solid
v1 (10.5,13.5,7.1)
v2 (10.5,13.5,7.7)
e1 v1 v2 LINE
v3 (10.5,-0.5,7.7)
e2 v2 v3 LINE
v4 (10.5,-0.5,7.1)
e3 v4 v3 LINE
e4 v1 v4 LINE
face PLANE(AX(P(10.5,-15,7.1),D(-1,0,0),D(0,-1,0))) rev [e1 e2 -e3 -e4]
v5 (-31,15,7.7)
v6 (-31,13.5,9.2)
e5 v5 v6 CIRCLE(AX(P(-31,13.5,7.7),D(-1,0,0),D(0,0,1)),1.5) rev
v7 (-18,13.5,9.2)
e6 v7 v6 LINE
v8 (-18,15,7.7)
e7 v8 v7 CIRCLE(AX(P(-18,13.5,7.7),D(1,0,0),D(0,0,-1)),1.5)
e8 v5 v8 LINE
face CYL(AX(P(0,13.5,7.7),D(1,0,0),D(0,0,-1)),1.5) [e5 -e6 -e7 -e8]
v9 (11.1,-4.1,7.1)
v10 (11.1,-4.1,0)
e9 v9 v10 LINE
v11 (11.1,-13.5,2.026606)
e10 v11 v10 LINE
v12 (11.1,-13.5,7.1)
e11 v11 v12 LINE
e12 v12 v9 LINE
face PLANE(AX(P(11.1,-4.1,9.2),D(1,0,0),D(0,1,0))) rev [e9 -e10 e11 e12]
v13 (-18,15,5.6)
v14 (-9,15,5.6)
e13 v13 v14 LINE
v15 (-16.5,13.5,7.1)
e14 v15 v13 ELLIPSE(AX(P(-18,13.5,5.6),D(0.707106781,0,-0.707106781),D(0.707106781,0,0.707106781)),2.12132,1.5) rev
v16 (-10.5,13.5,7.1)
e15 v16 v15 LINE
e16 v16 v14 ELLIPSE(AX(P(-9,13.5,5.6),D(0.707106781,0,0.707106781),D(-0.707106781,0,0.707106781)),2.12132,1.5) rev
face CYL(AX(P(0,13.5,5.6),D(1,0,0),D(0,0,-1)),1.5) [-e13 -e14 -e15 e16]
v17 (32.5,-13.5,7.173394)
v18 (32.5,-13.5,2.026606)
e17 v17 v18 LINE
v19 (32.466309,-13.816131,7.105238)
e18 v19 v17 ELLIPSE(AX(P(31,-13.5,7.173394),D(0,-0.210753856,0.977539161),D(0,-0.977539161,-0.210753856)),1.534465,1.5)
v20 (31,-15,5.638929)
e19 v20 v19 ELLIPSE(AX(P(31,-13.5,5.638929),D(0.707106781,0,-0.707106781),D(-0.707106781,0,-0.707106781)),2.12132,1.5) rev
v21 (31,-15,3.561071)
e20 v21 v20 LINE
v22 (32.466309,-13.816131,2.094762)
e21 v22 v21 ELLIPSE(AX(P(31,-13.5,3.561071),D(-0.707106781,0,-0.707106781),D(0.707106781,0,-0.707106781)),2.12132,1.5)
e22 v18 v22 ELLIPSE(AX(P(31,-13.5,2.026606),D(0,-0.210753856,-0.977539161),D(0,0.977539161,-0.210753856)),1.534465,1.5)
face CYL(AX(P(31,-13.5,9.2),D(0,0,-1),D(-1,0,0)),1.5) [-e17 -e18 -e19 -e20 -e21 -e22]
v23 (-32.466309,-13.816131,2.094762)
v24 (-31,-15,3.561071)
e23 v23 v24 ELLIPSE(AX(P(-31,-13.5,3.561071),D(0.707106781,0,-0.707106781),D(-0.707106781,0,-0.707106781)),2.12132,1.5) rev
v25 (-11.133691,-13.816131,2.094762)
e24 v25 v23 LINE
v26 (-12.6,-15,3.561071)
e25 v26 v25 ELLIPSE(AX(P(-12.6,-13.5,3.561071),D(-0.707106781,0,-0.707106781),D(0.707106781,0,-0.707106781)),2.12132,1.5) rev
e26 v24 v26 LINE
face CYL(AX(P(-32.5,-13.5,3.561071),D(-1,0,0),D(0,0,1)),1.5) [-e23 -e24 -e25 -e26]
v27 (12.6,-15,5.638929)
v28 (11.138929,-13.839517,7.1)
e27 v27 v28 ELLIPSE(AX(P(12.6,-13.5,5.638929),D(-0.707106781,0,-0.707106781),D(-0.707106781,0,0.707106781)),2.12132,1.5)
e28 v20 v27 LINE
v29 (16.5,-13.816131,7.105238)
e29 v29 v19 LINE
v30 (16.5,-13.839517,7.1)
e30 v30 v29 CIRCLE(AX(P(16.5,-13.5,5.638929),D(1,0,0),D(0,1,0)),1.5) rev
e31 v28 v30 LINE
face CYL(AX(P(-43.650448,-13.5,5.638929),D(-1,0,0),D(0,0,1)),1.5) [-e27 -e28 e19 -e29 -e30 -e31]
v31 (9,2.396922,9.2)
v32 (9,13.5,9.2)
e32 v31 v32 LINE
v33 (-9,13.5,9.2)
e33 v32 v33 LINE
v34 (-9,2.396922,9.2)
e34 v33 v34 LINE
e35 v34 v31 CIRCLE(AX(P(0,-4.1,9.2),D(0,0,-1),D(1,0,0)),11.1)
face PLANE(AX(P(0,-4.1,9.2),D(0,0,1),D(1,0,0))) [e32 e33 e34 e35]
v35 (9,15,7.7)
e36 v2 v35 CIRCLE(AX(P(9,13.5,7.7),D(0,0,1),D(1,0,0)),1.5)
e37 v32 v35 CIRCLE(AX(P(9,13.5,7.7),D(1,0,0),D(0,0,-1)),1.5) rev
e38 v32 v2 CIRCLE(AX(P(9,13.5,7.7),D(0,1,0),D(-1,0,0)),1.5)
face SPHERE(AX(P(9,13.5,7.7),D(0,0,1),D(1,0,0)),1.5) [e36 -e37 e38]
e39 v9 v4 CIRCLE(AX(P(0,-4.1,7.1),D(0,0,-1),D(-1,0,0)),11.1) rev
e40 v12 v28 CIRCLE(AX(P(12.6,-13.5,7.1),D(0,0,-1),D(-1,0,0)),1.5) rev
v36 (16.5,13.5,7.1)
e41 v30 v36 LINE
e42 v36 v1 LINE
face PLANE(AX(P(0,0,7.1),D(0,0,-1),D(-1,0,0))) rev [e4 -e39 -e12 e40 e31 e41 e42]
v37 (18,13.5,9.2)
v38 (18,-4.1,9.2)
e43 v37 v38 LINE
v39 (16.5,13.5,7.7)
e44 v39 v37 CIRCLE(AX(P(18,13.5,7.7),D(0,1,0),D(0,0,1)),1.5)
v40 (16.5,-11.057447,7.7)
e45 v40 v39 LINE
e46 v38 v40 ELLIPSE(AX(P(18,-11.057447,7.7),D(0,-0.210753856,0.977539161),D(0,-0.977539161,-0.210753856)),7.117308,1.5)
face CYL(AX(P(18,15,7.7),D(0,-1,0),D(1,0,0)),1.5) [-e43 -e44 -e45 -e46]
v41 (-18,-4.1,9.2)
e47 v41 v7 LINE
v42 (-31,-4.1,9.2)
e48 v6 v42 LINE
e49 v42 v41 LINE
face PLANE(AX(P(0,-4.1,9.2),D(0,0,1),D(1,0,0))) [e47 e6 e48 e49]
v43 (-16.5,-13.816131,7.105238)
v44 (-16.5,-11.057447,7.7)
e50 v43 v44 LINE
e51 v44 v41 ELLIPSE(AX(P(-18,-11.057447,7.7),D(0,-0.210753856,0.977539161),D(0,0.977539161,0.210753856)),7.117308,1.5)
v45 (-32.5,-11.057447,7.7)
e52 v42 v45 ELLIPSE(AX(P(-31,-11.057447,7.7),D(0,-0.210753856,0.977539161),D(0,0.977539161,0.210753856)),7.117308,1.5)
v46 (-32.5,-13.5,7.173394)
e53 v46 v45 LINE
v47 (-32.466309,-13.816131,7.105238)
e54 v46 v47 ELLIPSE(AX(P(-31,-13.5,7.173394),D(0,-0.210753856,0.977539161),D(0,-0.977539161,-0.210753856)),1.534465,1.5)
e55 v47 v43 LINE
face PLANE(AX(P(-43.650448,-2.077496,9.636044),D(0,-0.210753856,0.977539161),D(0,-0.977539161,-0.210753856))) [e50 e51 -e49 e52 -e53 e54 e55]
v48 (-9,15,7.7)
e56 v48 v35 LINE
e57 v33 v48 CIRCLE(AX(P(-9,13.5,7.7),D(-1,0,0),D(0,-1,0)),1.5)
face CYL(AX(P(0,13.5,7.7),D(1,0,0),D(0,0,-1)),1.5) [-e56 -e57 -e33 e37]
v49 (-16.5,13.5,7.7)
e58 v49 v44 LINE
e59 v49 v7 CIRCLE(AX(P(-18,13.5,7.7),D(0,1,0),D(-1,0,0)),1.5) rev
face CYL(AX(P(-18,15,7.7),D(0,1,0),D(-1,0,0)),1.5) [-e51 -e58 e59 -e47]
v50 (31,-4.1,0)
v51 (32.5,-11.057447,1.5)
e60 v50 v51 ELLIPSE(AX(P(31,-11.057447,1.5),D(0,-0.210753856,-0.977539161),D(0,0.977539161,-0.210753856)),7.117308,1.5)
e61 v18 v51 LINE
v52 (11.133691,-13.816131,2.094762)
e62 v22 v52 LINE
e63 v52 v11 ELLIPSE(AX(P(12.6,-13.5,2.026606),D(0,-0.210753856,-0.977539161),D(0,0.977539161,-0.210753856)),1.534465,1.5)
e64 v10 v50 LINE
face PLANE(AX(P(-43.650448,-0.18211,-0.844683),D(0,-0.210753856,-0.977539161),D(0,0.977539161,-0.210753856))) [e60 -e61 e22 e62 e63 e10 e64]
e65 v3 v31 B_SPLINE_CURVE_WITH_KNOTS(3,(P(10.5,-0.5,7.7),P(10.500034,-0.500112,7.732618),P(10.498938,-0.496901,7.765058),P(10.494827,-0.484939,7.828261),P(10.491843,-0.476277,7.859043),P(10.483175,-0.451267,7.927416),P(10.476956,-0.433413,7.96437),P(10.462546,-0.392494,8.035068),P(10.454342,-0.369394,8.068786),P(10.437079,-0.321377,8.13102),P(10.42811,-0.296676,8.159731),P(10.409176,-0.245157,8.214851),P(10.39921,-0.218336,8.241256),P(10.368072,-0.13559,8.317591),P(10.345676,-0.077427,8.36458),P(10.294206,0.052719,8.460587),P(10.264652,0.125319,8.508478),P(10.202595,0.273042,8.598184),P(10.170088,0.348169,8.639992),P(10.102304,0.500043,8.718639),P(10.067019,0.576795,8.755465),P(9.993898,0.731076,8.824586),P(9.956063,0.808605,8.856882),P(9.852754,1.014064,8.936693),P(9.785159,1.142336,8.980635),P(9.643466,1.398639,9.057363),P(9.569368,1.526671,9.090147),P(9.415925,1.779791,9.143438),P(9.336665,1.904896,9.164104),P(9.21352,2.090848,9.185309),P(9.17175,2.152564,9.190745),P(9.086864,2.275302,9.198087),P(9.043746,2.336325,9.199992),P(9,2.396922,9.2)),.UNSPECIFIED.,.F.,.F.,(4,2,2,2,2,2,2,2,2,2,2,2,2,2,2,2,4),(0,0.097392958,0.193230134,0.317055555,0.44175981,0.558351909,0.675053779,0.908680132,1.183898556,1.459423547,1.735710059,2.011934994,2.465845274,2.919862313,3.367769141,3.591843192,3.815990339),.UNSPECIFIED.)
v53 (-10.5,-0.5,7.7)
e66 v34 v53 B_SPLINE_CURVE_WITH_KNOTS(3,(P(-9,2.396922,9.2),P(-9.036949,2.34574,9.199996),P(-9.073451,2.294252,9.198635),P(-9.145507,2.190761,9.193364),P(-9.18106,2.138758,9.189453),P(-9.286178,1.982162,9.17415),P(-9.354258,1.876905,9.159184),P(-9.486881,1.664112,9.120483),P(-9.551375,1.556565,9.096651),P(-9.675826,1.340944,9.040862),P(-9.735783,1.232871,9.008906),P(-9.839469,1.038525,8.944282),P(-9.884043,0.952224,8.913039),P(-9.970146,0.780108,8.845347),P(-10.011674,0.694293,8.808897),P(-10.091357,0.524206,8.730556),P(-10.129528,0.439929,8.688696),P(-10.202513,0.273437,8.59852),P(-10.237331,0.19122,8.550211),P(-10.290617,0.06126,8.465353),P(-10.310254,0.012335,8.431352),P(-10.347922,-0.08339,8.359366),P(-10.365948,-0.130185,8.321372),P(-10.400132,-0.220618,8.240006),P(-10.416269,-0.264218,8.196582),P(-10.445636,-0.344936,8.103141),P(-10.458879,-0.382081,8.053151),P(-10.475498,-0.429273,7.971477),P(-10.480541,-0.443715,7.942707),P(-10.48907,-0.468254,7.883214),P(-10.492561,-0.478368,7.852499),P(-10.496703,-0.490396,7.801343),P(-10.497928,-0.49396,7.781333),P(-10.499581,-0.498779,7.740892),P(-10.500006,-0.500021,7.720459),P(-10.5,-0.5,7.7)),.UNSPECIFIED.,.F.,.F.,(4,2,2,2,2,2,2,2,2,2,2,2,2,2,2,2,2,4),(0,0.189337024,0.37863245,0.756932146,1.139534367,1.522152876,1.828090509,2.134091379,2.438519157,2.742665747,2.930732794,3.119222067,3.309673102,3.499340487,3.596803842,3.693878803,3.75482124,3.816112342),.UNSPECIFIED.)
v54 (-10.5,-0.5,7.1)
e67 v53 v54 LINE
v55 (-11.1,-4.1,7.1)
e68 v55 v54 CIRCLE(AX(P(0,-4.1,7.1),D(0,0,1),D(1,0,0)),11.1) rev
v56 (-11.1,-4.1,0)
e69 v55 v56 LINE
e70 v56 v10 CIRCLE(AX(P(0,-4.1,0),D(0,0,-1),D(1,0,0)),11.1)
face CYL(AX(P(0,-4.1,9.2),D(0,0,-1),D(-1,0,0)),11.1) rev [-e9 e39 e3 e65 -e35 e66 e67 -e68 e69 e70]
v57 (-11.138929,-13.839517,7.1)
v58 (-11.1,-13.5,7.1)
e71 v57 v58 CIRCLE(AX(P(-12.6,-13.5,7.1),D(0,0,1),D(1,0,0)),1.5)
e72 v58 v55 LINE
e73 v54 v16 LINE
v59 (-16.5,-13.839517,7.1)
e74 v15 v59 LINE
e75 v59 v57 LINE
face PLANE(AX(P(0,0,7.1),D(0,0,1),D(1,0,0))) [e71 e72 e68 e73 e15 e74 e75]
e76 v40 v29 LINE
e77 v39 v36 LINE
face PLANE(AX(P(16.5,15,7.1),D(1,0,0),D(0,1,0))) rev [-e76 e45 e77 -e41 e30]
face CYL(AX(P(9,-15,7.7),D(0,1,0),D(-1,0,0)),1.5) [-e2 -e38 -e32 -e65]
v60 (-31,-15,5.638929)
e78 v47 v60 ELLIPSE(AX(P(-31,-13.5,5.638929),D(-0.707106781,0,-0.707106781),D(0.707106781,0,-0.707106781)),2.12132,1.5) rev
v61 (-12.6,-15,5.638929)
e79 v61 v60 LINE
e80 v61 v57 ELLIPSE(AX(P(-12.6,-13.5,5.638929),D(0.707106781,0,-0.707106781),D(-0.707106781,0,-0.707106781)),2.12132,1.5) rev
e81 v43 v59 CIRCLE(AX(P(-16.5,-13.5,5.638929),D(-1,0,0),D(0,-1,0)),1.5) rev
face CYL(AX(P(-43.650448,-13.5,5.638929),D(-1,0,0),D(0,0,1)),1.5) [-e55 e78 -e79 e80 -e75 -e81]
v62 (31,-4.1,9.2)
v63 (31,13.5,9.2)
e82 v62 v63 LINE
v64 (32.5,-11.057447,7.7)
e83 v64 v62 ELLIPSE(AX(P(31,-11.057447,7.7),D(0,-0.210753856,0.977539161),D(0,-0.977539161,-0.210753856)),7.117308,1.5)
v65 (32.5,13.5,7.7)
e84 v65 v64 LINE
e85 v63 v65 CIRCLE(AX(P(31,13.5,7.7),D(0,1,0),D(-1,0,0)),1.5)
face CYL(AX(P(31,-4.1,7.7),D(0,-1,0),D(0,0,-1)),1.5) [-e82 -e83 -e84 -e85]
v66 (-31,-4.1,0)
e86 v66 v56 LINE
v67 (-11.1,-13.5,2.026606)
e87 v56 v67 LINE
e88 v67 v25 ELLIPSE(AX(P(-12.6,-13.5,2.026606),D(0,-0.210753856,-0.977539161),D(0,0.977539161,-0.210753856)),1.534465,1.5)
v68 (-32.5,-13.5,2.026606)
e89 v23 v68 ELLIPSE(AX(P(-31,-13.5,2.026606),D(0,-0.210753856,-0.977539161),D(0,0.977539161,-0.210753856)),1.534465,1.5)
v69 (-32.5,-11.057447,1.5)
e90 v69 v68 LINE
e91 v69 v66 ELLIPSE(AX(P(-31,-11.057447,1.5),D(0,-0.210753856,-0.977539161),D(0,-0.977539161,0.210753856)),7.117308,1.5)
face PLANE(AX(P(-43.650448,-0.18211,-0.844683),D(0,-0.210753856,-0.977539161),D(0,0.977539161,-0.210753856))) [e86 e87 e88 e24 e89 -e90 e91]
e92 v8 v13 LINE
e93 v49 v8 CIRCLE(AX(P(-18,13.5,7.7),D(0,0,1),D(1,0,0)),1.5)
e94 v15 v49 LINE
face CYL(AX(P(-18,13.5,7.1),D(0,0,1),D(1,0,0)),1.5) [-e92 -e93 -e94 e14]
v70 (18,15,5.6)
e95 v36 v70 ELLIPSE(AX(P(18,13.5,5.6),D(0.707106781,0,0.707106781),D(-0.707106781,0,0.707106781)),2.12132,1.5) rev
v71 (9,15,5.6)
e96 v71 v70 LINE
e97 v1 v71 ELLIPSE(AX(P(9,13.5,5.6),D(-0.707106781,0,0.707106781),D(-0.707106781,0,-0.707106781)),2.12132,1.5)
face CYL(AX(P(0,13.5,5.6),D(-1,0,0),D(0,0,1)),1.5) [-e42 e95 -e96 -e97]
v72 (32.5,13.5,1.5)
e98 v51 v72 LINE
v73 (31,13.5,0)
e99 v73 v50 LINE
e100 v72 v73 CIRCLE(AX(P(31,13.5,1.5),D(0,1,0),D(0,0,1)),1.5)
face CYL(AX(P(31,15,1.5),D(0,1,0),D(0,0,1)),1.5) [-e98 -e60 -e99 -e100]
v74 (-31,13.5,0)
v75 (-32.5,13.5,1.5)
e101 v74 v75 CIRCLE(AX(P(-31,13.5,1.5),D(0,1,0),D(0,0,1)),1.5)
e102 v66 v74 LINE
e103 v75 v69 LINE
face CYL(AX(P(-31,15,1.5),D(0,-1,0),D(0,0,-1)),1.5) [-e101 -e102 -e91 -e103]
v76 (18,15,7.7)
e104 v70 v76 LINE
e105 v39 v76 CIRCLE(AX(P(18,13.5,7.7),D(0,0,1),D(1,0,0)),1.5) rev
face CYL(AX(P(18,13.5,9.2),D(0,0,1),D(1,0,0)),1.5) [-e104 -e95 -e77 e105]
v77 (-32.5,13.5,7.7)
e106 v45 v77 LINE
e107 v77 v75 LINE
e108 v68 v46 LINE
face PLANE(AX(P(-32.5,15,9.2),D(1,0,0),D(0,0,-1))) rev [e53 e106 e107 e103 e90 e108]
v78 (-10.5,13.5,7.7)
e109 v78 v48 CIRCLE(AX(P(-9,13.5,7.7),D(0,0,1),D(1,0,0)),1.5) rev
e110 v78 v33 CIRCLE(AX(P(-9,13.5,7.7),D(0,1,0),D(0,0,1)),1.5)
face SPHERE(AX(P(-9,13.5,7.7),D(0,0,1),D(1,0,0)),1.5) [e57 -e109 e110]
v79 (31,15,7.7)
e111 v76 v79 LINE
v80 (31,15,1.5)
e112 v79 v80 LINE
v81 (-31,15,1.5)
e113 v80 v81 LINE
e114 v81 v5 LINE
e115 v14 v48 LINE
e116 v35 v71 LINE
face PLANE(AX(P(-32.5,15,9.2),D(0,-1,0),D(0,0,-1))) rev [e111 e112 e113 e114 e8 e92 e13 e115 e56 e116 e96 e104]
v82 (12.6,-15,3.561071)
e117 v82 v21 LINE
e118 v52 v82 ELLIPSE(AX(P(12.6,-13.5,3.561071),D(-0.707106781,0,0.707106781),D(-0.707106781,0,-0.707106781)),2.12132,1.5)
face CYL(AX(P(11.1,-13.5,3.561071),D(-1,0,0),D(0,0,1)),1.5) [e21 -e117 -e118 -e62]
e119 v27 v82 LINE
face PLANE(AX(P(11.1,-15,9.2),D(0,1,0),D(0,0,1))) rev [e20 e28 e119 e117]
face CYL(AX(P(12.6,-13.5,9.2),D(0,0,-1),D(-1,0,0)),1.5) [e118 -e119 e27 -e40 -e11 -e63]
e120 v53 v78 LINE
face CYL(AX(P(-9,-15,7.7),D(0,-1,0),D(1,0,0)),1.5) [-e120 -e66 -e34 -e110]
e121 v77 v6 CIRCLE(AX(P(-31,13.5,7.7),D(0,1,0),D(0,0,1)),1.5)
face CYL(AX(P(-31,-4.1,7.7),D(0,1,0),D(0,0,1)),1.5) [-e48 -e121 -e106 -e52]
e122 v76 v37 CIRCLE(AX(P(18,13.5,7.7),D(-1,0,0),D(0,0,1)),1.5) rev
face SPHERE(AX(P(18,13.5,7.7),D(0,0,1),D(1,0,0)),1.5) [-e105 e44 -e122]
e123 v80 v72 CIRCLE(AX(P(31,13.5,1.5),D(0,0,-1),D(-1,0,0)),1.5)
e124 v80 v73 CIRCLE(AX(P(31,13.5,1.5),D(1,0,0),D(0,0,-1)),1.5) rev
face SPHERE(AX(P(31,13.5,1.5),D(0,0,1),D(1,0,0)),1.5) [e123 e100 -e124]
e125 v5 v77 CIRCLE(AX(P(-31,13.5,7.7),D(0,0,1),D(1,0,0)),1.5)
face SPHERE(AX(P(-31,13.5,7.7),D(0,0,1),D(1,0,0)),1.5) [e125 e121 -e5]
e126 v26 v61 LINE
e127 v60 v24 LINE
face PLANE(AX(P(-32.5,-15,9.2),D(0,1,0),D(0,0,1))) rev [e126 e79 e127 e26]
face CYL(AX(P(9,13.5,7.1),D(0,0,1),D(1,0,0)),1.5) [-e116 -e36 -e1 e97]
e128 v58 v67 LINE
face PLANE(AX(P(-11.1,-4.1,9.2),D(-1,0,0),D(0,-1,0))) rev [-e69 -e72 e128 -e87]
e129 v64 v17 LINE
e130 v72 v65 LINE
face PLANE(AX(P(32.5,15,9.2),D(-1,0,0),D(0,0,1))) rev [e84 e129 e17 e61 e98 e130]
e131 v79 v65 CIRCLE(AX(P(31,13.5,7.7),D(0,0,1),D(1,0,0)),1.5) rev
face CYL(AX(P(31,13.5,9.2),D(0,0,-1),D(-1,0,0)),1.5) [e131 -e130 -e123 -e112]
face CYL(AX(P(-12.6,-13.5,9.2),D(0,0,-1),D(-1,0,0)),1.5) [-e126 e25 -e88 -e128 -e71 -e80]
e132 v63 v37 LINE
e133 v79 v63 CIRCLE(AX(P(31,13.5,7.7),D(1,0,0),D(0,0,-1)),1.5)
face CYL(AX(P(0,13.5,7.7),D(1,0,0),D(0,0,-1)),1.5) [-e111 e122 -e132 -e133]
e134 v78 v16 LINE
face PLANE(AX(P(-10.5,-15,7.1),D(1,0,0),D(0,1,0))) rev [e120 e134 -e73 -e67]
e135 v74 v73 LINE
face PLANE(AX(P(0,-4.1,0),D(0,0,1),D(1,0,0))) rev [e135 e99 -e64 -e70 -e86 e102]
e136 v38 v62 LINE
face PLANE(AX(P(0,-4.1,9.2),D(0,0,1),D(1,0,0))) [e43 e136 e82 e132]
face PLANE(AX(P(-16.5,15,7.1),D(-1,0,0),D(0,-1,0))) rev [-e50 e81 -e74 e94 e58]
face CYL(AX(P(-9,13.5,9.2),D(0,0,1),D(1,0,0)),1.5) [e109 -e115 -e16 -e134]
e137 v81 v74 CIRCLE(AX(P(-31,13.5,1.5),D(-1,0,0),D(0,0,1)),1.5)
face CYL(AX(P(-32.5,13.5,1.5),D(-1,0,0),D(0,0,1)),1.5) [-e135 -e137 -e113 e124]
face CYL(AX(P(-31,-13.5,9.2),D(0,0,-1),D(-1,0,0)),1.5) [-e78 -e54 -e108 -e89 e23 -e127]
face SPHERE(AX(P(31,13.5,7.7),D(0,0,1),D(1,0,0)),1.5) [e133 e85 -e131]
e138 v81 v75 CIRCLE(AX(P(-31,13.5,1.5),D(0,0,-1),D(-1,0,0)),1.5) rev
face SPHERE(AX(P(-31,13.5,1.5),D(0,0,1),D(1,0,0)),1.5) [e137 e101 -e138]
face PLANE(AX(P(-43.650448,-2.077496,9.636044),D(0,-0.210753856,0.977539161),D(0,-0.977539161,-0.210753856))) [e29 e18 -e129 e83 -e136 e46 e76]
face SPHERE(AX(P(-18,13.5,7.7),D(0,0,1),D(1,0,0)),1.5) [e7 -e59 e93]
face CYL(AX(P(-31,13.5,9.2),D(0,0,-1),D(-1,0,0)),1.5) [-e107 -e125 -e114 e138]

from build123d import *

# Parameters (mm, degrees)
EXTRUDE_1_DEPTH     = 9.2
SKETCH_3_W          = 6
SKETCH_3_H          = 30
CUT_EXTRUDE_2_DEPTH = 2.1
CUT_EXTRUDE_1_REACH = 69.34
FILLET_1_R          = 1.5


with BuildPart() as part:
    # 凸台-拉伸1: read off the stored shape, not the designer's step
    # 凸台-拉伸1 outline → 凸台-拉伸1 (new body)
    with BuildSketch(Plane.XY):
        with BuildLine():
            Line((11.1, -15), (32.5, -15))
            Line((32.5, -15), (32.5, 15))
            Line((32.5, 15), (-32.5, 15))
            Line((-32.5, 15), (-32.5, -15))
            Line((-32.5, -15), (-11.1, -15))
            Line((-11.1, -15), (-11.1, -4.1))
            ThreePointArc((-11.1, -4.1), (0, 7), (11.1, -4.1))
            Line((11.1, -4.1), (11.1, -15))
        make_face()
    extrude(amount=EXTRUDE_1_DEPTH)

    # 草图3 → 切除-拉伸2 (cut)
    with BuildSketch(Plane.XY.offset(9.2)):
        with Locations((-13.5, 0)):
            Rectangle(SKETCH_3_W, SKETCH_3_H)
        with Locations((13.5, 0)):
            Rectangle(SKETCH_3_W, SKETCH_3_H)
    extrude(amount=-CUT_EXTRUDE_2_DEPTH, mode=Mode.SUBTRACT)

    # 切除-拉伸1: up to this face of the body (flat: up to its plane)
    cut_extrude_1_end = Plane(part.part.faces().sort_by_distance((-32.5, 0, 4.6))[0])
    # 草图2 → 切除-拉伸1 (cut, up to the picked face)
    with BuildSketch(Plane(origin=(32.5, 0, 0), x_dir=(0, 0, -1), z_dir=(1, 0, 0)), mode=Mode.PRIVATE) as cut_extrude_1_sk1:
        Polygon((-6.85, -15), (-9.2, -4.1), (-9.2, -15), align=None)
    cut_extrude_1_tool1 = split(extrude(cut_extrude_1_sk1.sketch, amount=-CUT_EXTRUDE_1_REACH, mode=Mode.PRIVATE), bisect_by=cut_extrude_1_end, keep=Keep.BOTH, mode=Mode.PRIVATE)
    # 草图2 → 切除-拉伸1 (cut, up to the picked face)
    with BuildSketch(Plane(origin=(32.5, 0, 0), x_dir=(0, 0, -1), z_dir=(1, 0, 0)), mode=Mode.PRIVATE) as cut_extrude_1_sk2:
        Polygon((0, -4.1), (-2.35, -15), (0, -15), align=None)
    cut_extrude_1_tool2 = split(extrude(cut_extrude_1_sk2.sketch, amount=-CUT_EXTRUDE_1_REACH, mode=Mode.PRIVATE), bisect_by=cut_extrude_1_end, keep=Keep.BOTH, mode=Mode.PRIVATE)
    add(cut_extrude_1_tool1.solids().sort_by(Axis((32.5, -11.366667, 8.416667), (-1, 0, 0)))[0], mode=Mode.SUBTRACT)
    add(cut_extrude_1_tool2.solids().sort_by(Axis((32.5, -11.366667, 0.783333), (-1, 0, 0)))[0], mode=Mode.SUBTRACT)

    # 圆角1
    # the kernel refuses this fillet: 1.5 mm, written as the material it takes off along each edge
    with BuildSketch(Plane(origin=(-31, 13.5, 7.7), x_dir=(0, 0, 1), z_dir=(-1, 0, 0))) as fillet_1_piece_1_section:
        Polygon((0, 0), (FILLET_1_R, 0), (FILLET_1_R, FILLET_1_R), (0, FILLET_1_R), align=None)
    fillet_1_piece_1 = extrude(amount=FILLET_1_R, mode=Mode.PRIVATE)
    fillet_1_piece_1 = fillet_1_piece_1 - Plane(origin=(-31, 13.5, 7.7), x_dir=(0, -0.7071067811865475, -0.7071067811865475), z_dir=(-1, 0, 0)) * Sphere(FILLET_1_R, mode=Mode.PRIVATE)
    add(fillet_1_piece_1, mode=Mode.SUBTRACT)
    with BuildSketch(Plane(origin=(-31, 13.5, 1.5), x_dir=(0, 1, 0), z_dir=(-1, 0, 0))) as fillet_1_piece_2_section:
        Polygon((0, 0), (FILLET_1_R, 0), (FILLET_1_R, FILLET_1_R), (0, FILLET_1_R), align=None)
    fillet_1_piece_2 = extrude(amount=FILLET_1_R, mode=Mode.PRIVATE)
    fillet_1_piece_2 = fillet_1_piece_2 - Plane(origin=(-31, 13.5, 1.5), x_dir=(0, -0.7071067811865475, 0.7071067811865475), z_dir=(-1, 0, 0)) * Sphere(FILLET_1_R, mode=Mode.PRIVATE)
    add(fillet_1_piece_2, mode=Mode.SUBTRACT)
    with BuildSketch(Plane(origin=(31, 13.5, 1.5), x_dir=(1, 0, 0), z_dir=(0, 1, 0))) as fillet_1_piece_3_section:
        Polygon((0, 0), (FILLET_1_R, 0), (FILLET_1_R, FILLET_1_R), (0, FILLET_1_R), align=None)
    fillet_1_piece_3 = extrude(amount=FILLET_1_R, mode=Mode.PRIVATE)
    fillet_1_piece_3 = fillet_1_piece_3 - Plane(origin=(31, 13.5, 1.5), x_dir=(-0.7071067811865475, 0, 0.7071067811865475), z_dir=(0, 1, 0)) * Sphere(FILLET_1_R, mode=Mode.PRIVATE)
    add(fillet_1_piece_3, mode=Mode.SUBTRACT)
    with BuildSketch(Plane(origin=(31, 13.5, 7.7), x_dir=(0, 1, 0), z_dir=(0, 0, 1))) as fillet_1_piece_4_section:
        Polygon((0, 0), (FILLET_1_R, 0), (FILLET_1_R, -FILLET_1_R), (0, -FILLET_1_R), align=None)
    fillet_1_piece_4 = extrude(amount=FILLET_1_R, mode=Mode.PRIVATE)
    fillet_1_piece_4 = fillet_1_piece_4 - Plane(origin=(31, 13.5, 7.7), x_dir=(-0.7071067811865475, -0.7071067811865475, 0), z_dir=(0, 0, 1)) * Sphere(FILLET_1_R, mode=Mode.PRIVATE)
    add(fillet_1_piece_4, mode=Mode.SUBTRACT)
    with BuildSketch(Plane(origin=(18, 13.5, 7.7), x_dir=(-1, 0, 0), z_dir=(0, 0, 1))) as fillet_1_piece_5_section:
        Polygon((0, 0), (FILLET_1_R, 0), (FILLET_1_R, -FILLET_1_R), (0, -FILLET_1_R), align=None)
    fillet_1_piece_5 = extrude(amount=FILLET_1_R, mode=Mode.PRIVATE)
    fillet_1_piece_5 = fillet_1_piece_5 - Plane(origin=(18, 13.5, 7.7), x_dir=(0.7071067811865476, -0.7071067811865475, 0), z_dir=(0, 0, 1)) * Sphere(FILLET_1_R, mode=Mode.PRIVATE)
    add(fillet_1_piece_5, mode=Mode.SUBTRACT)
    with BuildSketch(Plane(origin=(-18, 13.5, 7.7), x_dir=(0, 1, 0), z_dir=(1, 0, 0))) as fillet_1_piece_6_section:
        Polygon((0, 0), (FILLET_1_R, 0), (FILLET_1_R, FILLET_1_R), (0, FILLET_1_R), align=None)
    fillet_1_piece_6 = extrude(amount=FILLET_1_R, mode=Mode.PRIVATE)
    fillet_1_piece_6 = fillet_1_piece_6 - Plane(origin=(-18, 13.5, 7.7), x_dir=(0, -0.7071067811865475, -0.7071067811865475), z_dir=(1, 0, 0)) * Sphere(FILLET_1_R, mode=Mode.PRIVATE)
    add(fillet_1_piece_6, mode=Mode.SUBTRACT)
    with BuildSketch(Plane(origin=(-9, 13.5, 7.7), x_dir=(0, 0, 1), z_dir=(0, 1, 0))) as fillet_1_piece_7_section:
        Polygon((0, 0), (FILLET_1_R, 0), (FILLET_1_R, -FILLET_1_R), (0, -FILLET_1_R), align=None)
    fillet_1_piece_7 = extrude(amount=FILLET_1_R, mode=Mode.PRIVATE)
    fillet_1_piece_7 = fillet_1_piece_7 - Plane(origin=(-9, 13.5, 7.7), x_dir=(0.7071067811865475, 0, -0.7071067811865475), z_dir=(0, 1, 0)) * Sphere(FILLET_1_R, mode=Mode.PRIVATE)
    add(fillet_1_piece_7, mode=Mode.SUBTRACT)
    with BuildSketch(Plane(origin=(9, 13.5, 7.7), x_dir=(1, 0, 0), z_dir=(0, 1, 0))) as fillet_1_piece_8_section:
        Polygon((0, 0), (FILLET_1_R, 0), (FILLET_1_R, -FILLET_1_R), (0, -FILLET_1_R), align=None)
    fillet_1_piece_8 = extrude(amount=FILLET_1_R, mode=Mode.PRIVATE)
    fillet_1_piece_8 = fillet_1_piece_8 - Plane(origin=(9, 13.5, 7.7), x_dir=(-0.7071067811865475, 0, -0.7071067811865475), z_dir=(0, 1, 0)) * Sphere(FILLET_1_R, mode=Mode.PRIVATE)
    add(fillet_1_piece_8, mode=Mode.SUBTRACT)
    with BuildSketch(Plane(origin=(-8.072322791, -15, 6.85), x_dir=(0, 0.9775391614749971, 0.2107538559143334), z_dir=(-1, 0, 0))) as fillet_1_piece_9:
        with BuildLine():
            CenterArc((FILLET_1_R * 0.807380589126, FILLET_1_R), FILLET_1_R, 192.166533775, 77.833466225)
            Line((-FILLET_1_R * 0.170158572349, FILLET_1_R * 0.789246144086), (0, 0))
            Line((0, 0), (FILLET_1_R * 0.807380589126, 0))
        make_face()
    extrude(amount=27.455354418, mode=Mode.SUBTRACT)
    with BuildSketch(Plane(origin=(-8.072322791, -15, 2.35), x_dir=(0, 0.977539161474997, -0.21075385591433374), z_dir=(-1, 0, 0)), Plane(origin=(35.527677209, -15, 6.85), x_dir=(0, 0, -1), z_dir=(-1, 0, 0)), Plane(origin=(35.527677209, -15, 2.35), x_dir=(0, 0.977539161474997, -0.21075385591433374), z_dir=(-1, 0, 0))) as fillet_1_piece_10:
        with BuildLine():
            CenterArc((FILLET_1_R * 0.807380589126, -FILLET_1_R), FILLET_1_R, 90, 77.833466225)
            Line((-FILLET_1_R * 0.170158572349, -FILLET_1_R * 0.789246144086), (0, 0))
            Line((0, 0), (FILLET_1_R * 0.807380589126, 0))
        make_face()
    extrude(amount=27.455354418, mode=Mode.SUBTRACT)
    with BuildSketch(Plane(origin=(-11.1, -15, -1.4), x_dir=(0, 1, 0), z_dir=(0, 0, 1))) as fillet_1_piece_11:
        with BuildLine():
            CenterArc((FILLET_1_R, FILLET_1_R), FILLET_1_R, 180, 90)
            Line((0, FILLET_1_R), (0, 0))
            Line((0, 0), (FILLET_1_R, 0))
        make_face()
    extrude(amount=12, mode=Mode.SUBTRACT)
    with BuildSketch(Plane(origin=(11.1, -15, -1.4), x_dir=(0, 1, 0), z_dir=(0, 0, 1)), Plane(origin=(32.5, -15, -1.4), x_dir=(-1, 0, 0), z_dir=(0, 0, 1)), Plane(origin=(-32.5, -15, -1.4), x_dir=(0, 1, 0), z_dir=(0, 0, 1))) as fillet_1_piece_12:
        with BuildLine():
            CenterArc((FILLET_1_R, -FILLET_1_R), FILLET_1_R, 90, 90)
            Line((0, -FILLET_1_R), (0, 0))
            Line((0, 0), (FILLET_1_R, 0))
        make_face()
    extrude(amount=12, mode=Mode.SUBTRACT)
    with BuildSketch(Plane(origin=(-32.5, 13.5, 9.2), x_dir=(0, 0, -1), z_dir=(0, -1, 0)), Plane(origin=(-32.5, 13.5, 0), x_dir=(1, 0, 0), z_dir=(0, -1, 0)), Plane(origin=(32.5, -15.35, 9.2), x_dir=(0, 0, -1), z_dir=(0, 1, 0)), Plane(origin=(-16.5, 13.5, 9.2), x_dir=(-1, 0, 0), z_dir=(0, -1, 0))) as fillet_1_piece_13:
        with BuildLine():
            CenterArc((FILLET_1_R, FILLET_1_R), FILLET_1_R, 180, 90)
            Line((0, FILLET_1_R), (0, 0))
            Line((0, 0), (FILLET_1_R, 0))
        make_face()
    extrude(amount=28.85, mode=Mode.SUBTRACT)
    with BuildSketch(Plane(origin=(32.5, -15.35, 0), x_dir=(0, 0, 1), z_dir=(0, 1, 0)), Plane(origin=(16.5, 13.5, 9.2), x_dir=(1, 0, 0), z_dir=(0, -1, 0))) as fillet_1_piece_14:
        with BuildLine():
            CenterArc((FILLET_1_R, -FILLET_1_R), FILLET_1_R, 90, 90)
            Line((0, -FILLET_1_R), (0, 0))
            Line((0, 0), (FILLET_1_R, 0))
        make_face()
    extrude(amount=28.85, mode=Mode.SUBTRACT)
    with BuildSketch(Plane(origin=(32.5, 15, 1.5), x_dir=(0, -1, 0), z_dir=(0, 0, 1)), Plane(origin=(-32.5, 15, 1.5), x_dir=(1, 0, 0), z_dir=(0, 0, 1))) as fillet_1_piece_15:
        with BuildLine():
            CenterArc((FILLET_1_R, -FILLET_1_R), FILLET_1_R, 90, 90)
            Line((0, -FILLET_1_R), (0, 0))
            Line((0, 0), (FILLET_1_R, 0))
        make_face()
    extrude(amount=6.2, mode=Mode.SUBTRACT)
    with BuildSketch(Plane(origin=(31, 15, 0), x_dir=(0, -1, 0), z_dir=(-1, 0, 0))) as fillet_1_piece_16:
        with BuildLine():
            CenterArc((FILLET_1_R, FILLET_1_R), FILLET_1_R, 180, 90)
            Line((0, FILLET_1_R), (0, 0))
            Line((0, 0), (FILLET_1_R, 0))
        make_face()
    extrude(amount=62, mode=Mode.SUBTRACT)
    with BuildSketch(Plane(origin=(31, 15, 9.2), x_dir=(0, -1, 0), z_dir=(-1, 0, 0))) as fillet_1_piece_17:
        with BuildLine():
            CenterArc((FILLET_1_R, -FILLET_1_R), FILLET_1_R, 90, 90)
            Line((0, -FILLET_1_R), (0, 0))
            Line((0, 0), (FILLET_1_R, 0))
        make_face()
    extrude(amount=13, mode=Mode.SUBTRACT)
    with BuildSketch(Plane(origin=(-18, 15, 9.2), x_dir=(0, 0, -1), z_dir=(-1, 0, 0))) as fillet_1_piece_18:
        with BuildLine():
            CenterArc((FILLET_1_R, FILLET_1_R), FILLET_1_R, 180, 90)
            Line((0, FILLET_1_R), (0, 0))
            Line((0, 0), (FILLET_1_R, 0))
        make_face()
    extrude(amount=13, mode=Mode.SUBTRACT)
    with BuildSketch(Plane(origin=(-10.5, -4.25, 9.2), x_dir=(1, 0, 0), z_dir=(0, 1, 0)), Plane(origin=(10.5, -4.25, 9.2), x_dir=(0, 0, -1), z_dir=(0, 1, 0))) as fillet_1_piece_19:
        with BuildLine():
            CenterArc((FILLET_1_R, FILLET_1_R), FILLET_1_R, 180, 90)
            Line((0, FILLET_1_R), (0, 0))
            Line((0, 0), (FILLET_1_R, 0))
        make_face()
    extrude(amount=17.75, mode=Mode.SUBTRACT)
    with BuildSketch(Plane(origin=(16.5, 15, 7.7), x_dir=(0, -1, 0), z_dir=(0, 0, -1)), Plane(origin=(10.5, 15, 7.7), x_dir=(-1, 0, 0), z_dir=(0, 0, -1)), Plane(origin=(-16.5, 15, 7.7), x_dir=(-1, 0, 0), z_dir=(0, 0, -1))) as fillet_1_piece_20:
        with BuildLine():
            CenterArc((FILLET_1_R, -FILLET_1_R), FILLET_1_R, 90, 90)
            Line((0, -FILLET_1_R), (0, 0))
            Line((0, 0), (FILLET_1_R, 0))
        make_face()
    extrude(amount=0.6, mode=Mode.SUBTRACT)
    with BuildSketch(Plane(origin=(10.5, 15, 7.1), x_dir=(0, -1, 0), z_dir=(1, 0, 0)), Plane(origin=(-10.5, 15, 7.1), x_dir=(0, 0, -1), z_dir=(-1, 0, 0))) as fillet_1_piece_21:
        with BuildLine():
            CenterArc((FILLET_1_R, FILLET_1_R), FILLET_1_R, 180, 90)
            Line((0, FILLET_1_R), (0, 0))
            Line((0, 0), (FILLET_1_R, 0))
        make_face()
    extrude(amount=6, mode=Mode.SUBTRACT)
    with BuildSketch(Plane(origin=(9, 15, 9.2), x_dir=(0, 0, -1), z_dir=(-1, 0, 0))) as fillet_1_piece_22:
        with BuildLine():
            CenterArc((FILLET_1_R, FILLET_1_R), FILLET_1_R, 180, 90)
            Line((0, FILLET_1_R), (0, 0))
            Line((0, 0), (FILLET_1_R, 0))
        make_face()
    extrude(amount=18, mode=Mode.SUBTRACT)
    with BuildSketch(Plane(origin=(-10.5, 15, 7.7), x_dir=(1, 0, 0), z_dir=(0, 0, -1))) as fillet_1_piece_23:
        with BuildLine():
            CenterArc((FILLET_1_R, FILLET_1_R), FILLET_1_R, 180, 90)
            Line((0, FILLET_1_R), (0, 0))
            Line((0, 0), (FILLET_1_R, 0))
        make_face()
    extrude(amount=0.6, mode=Mode.SUBTRACT)
    with BuildSketch(Plane(origin=(10.5, 15, 7.1), x_dir=(0, -1, 0), z_dir=(1, 0, 0))) as fillet_1_piece_24a_section:
        with BuildLine():
            CenterArc((FILLET_1_R, FILLET_1_R), FILLET_1_R, 180, 90)
            Line((0, FILLET_1_R), (0, 0))
            Line((0, 0), (FILLET_1_R, 0))
        make_face()
    fillet_1_piece_24a = extrude(amount=9.75, mode=Mode.PRIVATE)
    fillet_1_piece_24a = split(fillet_1_piece_24a, bisect_by=Plane(origin=(16.5, 15, 7.1), z_dir=(1, 0, 0)), keep=Keep.TOP, mode=Mode.PRIVATE)
    with BuildSketch(Plane(origin=(16.5, 15, 7.7), x_dir=(0, -1, 0), z_dir=(0, 0, -1))) as fillet_1_piece_24b_section:
        with BuildLine():
            CenterArc((FILLET_1_R, -FILLET_1_R), FILLET_1_R, 90, 90)
            Line((0, -FILLET_1_R), (0, 0))
            Line((0, 0), (FILLET_1_R, 0))
        make_face()
    fillet_1_piece_24b = extrude(amount=4.35, mode=Mode.PRIVATE)
    fillet_1_piece_24b = split(fillet_1_piece_24b, bisect_by=Plane(origin=(16.5, 15, 7.1), z_dir=(0, 0, -1)), keep=Keep.TOP, mode=Mode.PRIVATE)
    fillet_1_piece_24 = fillet_1_piece_24a & fillet_1_piece_24b
    add(fillet_1_piece_24, mode=Mode.SUBTRACT)
    with BuildSketch(Plane(origin=(6.75, 15, 7.1), x_dir=(0, -1, 0), z_dir=(1, 0, 0))) as fillet_1_piece_25a_section:
        with BuildLine():
            CenterArc((FILLET_1_R, FILLET_1_R), FILLET_1_R, 180, 90)
            Line((0, FILLET_1_R), (0, 0))
            Line((0, 0), (FILLET_1_R, 0))
        make_face()
    fillet_1_piece_25a = extrude(amount=9.75, mode=Mode.PRIVATE)
    fillet_1_piece_25a = split(fillet_1_piece_25a, bisect_by=Plane(origin=(10.5, 15, 7.1), z_dir=(-1, 0, 0)), keep=Keep.TOP, mode=Mode.PRIVATE)
    with BuildSketch(Plane(origin=(10.5, 15, 7.7), x_dir=(-1, 0, 0), z_dir=(0, 0, -1))) as fillet_1_piece_25b_section:
        with BuildLine():
            CenterArc((FILLET_1_R, -FILLET_1_R), FILLET_1_R, 90, 90)
            Line((0, -FILLET_1_R), (0, 0))
            Line((0, 0), (FILLET_1_R, 0))
        make_face()
    fillet_1_piece_25b = extrude(amount=4.35, mode=Mode.PRIVATE)
    fillet_1_piece_25b = split(fillet_1_piece_25b, bisect_by=Plane(origin=(10.5, 15, 7.1), z_dir=(0, 0, -1)), keep=Keep.TOP, mode=Mode.PRIVATE)
    fillet_1_piece_25 = fillet_1_piece_25a & fillet_1_piece_25b
    add(fillet_1_piece_25, mode=Mode.SUBTRACT)
    with BuildSketch(Plane(origin=(-6.75, 15, 7.1), x_dir=(0, 0, -1), z_dir=(-1, 0, 0))) as fillet_1_piece_26a_section:
        with BuildLine():
            CenterArc((FILLET_1_R, FILLET_1_R), FILLET_1_R, 180, 90)
            Line((0, FILLET_1_R), (0, 0))
            Line((0, 0), (FILLET_1_R, 0))
        make_face()
    fillet_1_piece_26a = extrude(amount=9.75, mode=Mode.PRIVATE)
    fillet_1_piece_26a = split(fillet_1_piece_26a, bisect_by=Plane(origin=(-10.5, 15, 7.1), z_dir=(1, 0, 0)), keep=Keep.TOP, mode=Mode.PRIVATE)
    with BuildSketch(Plane(origin=(-10.5, 15, 7.7), x_dir=(1, 0, 0), z_dir=(0, 0, -1))) as fillet_1_piece_26b_section:
        with BuildLine():
            CenterArc((FILLET_1_R, FILLET_1_R), FILLET_1_R, 180, 90)
            Line((0, FILLET_1_R), (0, 0))
            Line((0, 0), (FILLET_1_R, 0))
        make_face()
    fillet_1_piece_26b = extrude(amount=4.35, mode=Mode.PRIVATE)
    fillet_1_piece_26b = split(fillet_1_piece_26b, bisect_by=Plane(origin=(-10.5, 15, 7.1), z_dir=(0, 0, -1)), keep=Keep.TOP, mode=Mode.PRIVATE)
    fillet_1_piece_26 = fillet_1_piece_26a & fillet_1_piece_26b
    add(fillet_1_piece_26, mode=Mode.SUBTRACT)
    with BuildSketch(Plane(origin=(-16.5, 15, 7.7), x_dir=(-1, 0, 0), z_dir=(0, 0, -1))) as fillet_1_piece_27a_section:
        with BuildLine():
            CenterArc((FILLET_1_R, -FILLET_1_R), FILLET_1_R, 90, 90)
            Line((0, -FILLET_1_R), (0, 0))
            Line((0, 0), (FILLET_1_R, 0))
        make_face()
    fillet_1_piece_27a = extrude(amount=4.35, mode=Mode.PRIVATE)
    fillet_1_piece_27a = split(fillet_1_piece_27a, bisect_by=Plane(origin=(-16.5, 15, 7.1), z_dir=(0, 0, -1)), keep=Keep.TOP, mode=Mode.PRIVATE)
    with BuildSketch(Plane(origin=(-10.5, 15, 7.1), x_dir=(0, 0, -1), z_dir=(-1, 0, 0))) as fillet_1_piece_27b_section:
        with BuildLine():
            CenterArc((FILLET_1_R, FILLET_1_R), FILLET_1_R, 180, 90)
            Line((0, FILLET_1_R), (0, 0))
            Line((0, 0), (FILLET_1_R, 0))
        make_face()
    fillet_1_piece_27b = extrude(amount=9.75, mode=Mode.PRIVATE)
    fillet_1_piece_27b = split(fillet_1_piece_27b, bisect_by=Plane(origin=(-16.5, 15, 7.1), z_dir=(-1, 0, 0)), keep=Keep.TOP, mode=Mode.PRIVATE)
    fillet_1_piece_27 = fillet_1_piece_27a & fillet_1_piece_27b
    add(fillet_1_piece_27, mode=Mode.SUBTRACT)


solid = part.part
